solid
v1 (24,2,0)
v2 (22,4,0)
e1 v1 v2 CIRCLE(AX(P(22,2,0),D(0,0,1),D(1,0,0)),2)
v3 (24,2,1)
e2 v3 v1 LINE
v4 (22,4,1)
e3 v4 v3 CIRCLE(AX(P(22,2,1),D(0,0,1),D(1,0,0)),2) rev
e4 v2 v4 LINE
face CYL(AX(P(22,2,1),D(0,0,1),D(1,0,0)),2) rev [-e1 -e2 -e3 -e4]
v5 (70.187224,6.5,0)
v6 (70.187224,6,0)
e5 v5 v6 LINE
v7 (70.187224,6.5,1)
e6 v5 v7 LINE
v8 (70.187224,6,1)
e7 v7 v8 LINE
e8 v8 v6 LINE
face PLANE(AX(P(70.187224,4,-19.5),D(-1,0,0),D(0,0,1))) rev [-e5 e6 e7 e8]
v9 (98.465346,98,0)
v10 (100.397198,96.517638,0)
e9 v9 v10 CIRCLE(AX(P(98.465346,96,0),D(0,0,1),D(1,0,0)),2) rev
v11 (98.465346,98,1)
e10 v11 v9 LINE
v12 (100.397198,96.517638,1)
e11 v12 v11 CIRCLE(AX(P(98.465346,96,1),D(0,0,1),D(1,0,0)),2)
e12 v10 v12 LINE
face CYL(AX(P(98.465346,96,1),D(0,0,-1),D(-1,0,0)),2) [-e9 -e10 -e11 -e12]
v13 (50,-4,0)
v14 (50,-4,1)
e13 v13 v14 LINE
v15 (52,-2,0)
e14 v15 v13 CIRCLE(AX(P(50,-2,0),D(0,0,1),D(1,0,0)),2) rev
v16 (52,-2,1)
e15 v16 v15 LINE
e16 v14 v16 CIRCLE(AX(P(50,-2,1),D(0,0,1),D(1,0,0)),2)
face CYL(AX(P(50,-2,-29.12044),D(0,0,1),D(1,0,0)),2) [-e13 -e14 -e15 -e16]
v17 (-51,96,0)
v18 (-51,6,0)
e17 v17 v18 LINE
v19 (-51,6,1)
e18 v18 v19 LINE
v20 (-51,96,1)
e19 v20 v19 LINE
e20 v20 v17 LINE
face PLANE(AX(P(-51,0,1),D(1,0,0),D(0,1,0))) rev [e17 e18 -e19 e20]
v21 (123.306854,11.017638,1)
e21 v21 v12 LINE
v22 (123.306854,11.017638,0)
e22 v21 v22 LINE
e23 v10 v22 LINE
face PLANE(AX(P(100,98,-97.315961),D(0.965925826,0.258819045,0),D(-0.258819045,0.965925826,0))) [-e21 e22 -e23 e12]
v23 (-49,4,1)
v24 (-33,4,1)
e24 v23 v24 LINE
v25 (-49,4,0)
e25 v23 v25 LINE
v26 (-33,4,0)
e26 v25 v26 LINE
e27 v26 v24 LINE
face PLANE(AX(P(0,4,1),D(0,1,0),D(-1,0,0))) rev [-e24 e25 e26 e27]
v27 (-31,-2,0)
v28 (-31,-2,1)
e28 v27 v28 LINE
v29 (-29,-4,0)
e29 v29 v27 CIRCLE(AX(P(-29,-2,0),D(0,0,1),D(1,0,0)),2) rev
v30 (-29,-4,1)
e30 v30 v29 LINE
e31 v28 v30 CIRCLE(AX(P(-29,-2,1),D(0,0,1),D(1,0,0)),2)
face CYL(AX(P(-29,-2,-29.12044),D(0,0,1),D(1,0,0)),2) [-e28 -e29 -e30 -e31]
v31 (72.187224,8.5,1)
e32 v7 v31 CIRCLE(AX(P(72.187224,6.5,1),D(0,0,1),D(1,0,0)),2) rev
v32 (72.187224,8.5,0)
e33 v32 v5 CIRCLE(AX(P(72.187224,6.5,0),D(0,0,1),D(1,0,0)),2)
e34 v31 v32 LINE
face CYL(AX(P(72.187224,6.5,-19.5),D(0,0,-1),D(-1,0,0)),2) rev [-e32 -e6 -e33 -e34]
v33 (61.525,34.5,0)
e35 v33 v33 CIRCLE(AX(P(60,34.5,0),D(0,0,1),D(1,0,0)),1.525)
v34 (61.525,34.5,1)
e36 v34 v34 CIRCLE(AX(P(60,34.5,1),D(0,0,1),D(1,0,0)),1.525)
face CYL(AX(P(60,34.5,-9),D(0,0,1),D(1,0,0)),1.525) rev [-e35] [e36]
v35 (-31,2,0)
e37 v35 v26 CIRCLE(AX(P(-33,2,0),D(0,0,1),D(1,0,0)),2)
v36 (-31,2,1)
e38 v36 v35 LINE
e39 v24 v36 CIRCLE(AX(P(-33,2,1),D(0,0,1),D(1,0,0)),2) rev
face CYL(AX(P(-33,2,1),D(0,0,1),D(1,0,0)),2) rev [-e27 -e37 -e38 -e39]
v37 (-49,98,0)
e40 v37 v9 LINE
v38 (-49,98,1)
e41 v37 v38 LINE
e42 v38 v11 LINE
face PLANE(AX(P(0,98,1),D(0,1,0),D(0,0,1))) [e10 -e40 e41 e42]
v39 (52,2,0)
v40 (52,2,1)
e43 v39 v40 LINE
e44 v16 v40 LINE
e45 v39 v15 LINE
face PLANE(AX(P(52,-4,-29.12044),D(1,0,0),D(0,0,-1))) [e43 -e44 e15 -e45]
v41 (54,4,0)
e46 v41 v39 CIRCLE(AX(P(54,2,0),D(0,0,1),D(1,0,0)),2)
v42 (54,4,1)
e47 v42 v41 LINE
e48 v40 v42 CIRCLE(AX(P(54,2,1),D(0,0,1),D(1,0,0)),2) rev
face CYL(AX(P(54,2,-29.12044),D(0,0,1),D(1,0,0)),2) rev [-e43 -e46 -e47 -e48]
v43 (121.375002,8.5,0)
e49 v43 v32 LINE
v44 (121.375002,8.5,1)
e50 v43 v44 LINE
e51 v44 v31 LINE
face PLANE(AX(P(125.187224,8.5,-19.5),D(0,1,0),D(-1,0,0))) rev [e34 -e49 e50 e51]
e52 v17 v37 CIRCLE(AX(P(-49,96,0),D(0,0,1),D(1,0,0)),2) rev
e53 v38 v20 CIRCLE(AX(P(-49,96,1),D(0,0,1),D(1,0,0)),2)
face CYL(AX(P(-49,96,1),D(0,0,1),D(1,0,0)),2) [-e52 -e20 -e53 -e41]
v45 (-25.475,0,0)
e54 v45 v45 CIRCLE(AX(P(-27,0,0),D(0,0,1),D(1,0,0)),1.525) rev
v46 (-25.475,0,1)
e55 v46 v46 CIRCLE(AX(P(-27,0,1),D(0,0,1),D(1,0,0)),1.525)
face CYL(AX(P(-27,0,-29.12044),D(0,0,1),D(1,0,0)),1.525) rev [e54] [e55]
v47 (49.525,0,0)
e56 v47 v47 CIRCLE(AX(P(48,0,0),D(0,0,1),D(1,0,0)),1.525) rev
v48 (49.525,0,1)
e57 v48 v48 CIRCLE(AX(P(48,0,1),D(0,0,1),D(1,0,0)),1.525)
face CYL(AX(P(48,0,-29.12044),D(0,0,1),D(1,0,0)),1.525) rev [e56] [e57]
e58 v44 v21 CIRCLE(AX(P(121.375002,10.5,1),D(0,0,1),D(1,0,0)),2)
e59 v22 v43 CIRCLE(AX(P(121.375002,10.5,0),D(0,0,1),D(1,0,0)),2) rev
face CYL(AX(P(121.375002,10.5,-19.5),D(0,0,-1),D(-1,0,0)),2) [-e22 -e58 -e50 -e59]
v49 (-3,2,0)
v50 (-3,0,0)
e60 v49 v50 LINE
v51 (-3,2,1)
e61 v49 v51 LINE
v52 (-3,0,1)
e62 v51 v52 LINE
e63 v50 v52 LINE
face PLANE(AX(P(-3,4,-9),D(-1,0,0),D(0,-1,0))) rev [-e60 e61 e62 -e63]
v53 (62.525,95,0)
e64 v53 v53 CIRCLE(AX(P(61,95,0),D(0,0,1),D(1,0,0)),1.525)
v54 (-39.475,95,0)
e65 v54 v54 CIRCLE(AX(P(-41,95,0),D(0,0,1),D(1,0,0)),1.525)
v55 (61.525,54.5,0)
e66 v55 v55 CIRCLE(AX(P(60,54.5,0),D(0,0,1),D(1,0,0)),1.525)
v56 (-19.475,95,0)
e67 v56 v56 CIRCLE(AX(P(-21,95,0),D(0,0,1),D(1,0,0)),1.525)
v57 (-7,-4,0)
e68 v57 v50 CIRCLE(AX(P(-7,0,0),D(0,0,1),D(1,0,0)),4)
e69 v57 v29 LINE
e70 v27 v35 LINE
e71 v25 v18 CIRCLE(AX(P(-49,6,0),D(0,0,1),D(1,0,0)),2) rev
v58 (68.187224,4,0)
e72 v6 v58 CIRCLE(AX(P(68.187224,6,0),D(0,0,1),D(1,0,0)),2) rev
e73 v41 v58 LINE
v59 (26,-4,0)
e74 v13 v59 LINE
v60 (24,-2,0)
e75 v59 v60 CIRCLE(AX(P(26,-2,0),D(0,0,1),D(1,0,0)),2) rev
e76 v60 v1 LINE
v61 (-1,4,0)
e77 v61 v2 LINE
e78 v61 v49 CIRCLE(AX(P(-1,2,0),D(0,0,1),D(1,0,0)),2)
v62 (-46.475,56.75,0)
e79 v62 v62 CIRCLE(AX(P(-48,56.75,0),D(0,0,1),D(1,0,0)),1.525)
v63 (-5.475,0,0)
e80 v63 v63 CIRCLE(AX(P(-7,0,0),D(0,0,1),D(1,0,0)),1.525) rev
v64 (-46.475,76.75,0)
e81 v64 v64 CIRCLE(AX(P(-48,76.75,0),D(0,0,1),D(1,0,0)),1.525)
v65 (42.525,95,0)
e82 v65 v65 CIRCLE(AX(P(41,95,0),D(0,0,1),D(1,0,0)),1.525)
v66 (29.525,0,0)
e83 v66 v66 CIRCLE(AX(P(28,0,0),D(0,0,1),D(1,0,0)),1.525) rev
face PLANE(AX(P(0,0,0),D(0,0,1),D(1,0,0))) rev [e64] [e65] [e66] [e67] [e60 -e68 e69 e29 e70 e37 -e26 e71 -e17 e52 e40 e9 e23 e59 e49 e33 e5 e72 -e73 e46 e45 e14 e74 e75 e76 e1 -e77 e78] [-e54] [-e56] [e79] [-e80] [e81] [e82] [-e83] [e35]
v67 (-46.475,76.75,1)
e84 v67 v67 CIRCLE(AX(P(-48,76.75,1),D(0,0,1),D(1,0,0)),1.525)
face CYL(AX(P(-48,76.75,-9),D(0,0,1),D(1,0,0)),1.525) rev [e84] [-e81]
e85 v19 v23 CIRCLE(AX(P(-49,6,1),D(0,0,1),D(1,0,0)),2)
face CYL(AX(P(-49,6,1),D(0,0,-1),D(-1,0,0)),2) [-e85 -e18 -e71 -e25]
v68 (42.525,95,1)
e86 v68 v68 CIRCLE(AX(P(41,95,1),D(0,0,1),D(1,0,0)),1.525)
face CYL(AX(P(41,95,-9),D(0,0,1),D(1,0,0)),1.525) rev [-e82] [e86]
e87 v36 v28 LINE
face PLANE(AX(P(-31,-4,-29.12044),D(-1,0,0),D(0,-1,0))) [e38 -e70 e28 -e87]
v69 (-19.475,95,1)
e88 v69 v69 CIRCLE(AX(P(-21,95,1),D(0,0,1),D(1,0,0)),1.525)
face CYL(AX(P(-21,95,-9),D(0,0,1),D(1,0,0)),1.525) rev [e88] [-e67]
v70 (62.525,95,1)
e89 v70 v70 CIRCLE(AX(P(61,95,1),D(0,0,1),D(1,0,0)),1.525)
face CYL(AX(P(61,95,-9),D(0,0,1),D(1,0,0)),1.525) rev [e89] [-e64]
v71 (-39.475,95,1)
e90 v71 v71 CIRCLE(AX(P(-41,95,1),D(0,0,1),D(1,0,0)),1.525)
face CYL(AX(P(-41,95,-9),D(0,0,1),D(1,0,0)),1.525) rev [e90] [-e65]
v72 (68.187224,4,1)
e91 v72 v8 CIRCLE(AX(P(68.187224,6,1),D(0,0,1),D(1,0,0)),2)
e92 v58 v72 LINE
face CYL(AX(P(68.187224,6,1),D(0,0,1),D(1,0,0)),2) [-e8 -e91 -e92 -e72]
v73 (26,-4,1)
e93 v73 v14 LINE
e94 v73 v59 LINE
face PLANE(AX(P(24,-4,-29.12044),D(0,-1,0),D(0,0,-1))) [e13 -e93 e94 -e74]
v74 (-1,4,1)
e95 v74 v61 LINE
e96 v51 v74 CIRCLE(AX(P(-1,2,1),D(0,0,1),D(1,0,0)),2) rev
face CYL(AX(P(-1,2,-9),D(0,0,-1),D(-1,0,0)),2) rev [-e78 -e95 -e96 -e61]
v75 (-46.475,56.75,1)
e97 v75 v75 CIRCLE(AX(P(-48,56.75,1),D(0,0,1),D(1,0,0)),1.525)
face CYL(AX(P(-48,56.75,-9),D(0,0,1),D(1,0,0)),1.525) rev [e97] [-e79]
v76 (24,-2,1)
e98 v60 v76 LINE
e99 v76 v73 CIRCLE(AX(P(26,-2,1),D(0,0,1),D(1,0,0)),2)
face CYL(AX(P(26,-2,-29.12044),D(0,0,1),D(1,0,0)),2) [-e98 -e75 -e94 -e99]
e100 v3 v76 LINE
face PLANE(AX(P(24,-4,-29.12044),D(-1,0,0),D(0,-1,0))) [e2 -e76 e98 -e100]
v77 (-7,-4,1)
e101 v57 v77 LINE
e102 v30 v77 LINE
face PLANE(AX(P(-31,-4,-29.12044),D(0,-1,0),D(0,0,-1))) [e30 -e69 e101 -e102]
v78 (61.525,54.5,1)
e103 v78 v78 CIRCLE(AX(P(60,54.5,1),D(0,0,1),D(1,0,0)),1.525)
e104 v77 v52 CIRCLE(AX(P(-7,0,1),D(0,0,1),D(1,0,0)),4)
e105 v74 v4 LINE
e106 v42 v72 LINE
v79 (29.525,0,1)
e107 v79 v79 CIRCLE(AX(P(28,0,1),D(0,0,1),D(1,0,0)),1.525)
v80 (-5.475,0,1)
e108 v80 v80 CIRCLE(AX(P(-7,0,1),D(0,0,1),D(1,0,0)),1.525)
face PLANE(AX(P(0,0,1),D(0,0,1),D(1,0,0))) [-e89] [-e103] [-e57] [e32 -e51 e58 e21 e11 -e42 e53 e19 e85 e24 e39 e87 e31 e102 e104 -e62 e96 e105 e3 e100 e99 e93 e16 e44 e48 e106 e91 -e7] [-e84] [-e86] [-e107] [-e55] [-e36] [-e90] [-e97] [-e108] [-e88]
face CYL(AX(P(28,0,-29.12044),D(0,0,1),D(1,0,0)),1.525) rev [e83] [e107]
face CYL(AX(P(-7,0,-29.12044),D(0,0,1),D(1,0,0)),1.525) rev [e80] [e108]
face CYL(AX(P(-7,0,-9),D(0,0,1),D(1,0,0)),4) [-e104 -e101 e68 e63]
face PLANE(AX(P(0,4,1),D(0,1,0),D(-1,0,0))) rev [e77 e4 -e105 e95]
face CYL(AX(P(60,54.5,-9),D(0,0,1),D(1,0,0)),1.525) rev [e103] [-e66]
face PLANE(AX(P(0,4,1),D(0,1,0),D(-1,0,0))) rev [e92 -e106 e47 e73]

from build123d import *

# Parameters (mm, degrees)
SKETCH_1_W                 = 28
SKETCH_1_H                 = 8
SKETCH_1_R                 = 1.525
EXTRUDE_1_DEPTH            = 1
SKETCH_3_R                 = 1.525
CUT_EXTRUDE_1_DEPTH        = 10
SKETCH_5_R                 = 1.525
CUT_EXTRUDE_3_DEPTH        = 10
SKETCH_6_R                 = 1.525
CUT_EXTRUDE_4_DEPTH        = 10
EXTRUDE_2_DEPTH            = 1
SKETCH_9_W                 = 55
SKETCH_9_H                 = 4.5
CUT_EXTRUDE_5_DEPTH        = 20.5
FILLET_1_R                 = 2
SKETCH_10_R                = 1.525
CUT_EXTRUDE_6_DEPTH        = 10
SKETCH_11_W                = 28
SKETCH_11_H                = 8
SKETCH_11_R                = 1.525
EXTRUDE_3_DEPTH            = 1
FILLET_2_R                 = 2
SKETCH_12_W                = 29
SKETCH_12_H                = 8
CUT_EXTRUDE_7_DEPTH        = 10
PATTERN_LINEAR_1_OUTLINE_R = 1.525
PATTERN_LINEAR_1_DEPTH     = 1
CUT_EXTRUDE_8_DEPTH        = 10
FILLET_3_R                 = 2
FILLET_4_R                 = 2


with BuildPart() as part:
    # 草图1 → 凸台-拉伸1 (new body)
    # profile 1 of 2: a face of its own
    with BuildSketch(Plane.XY):
        Polygon((-4, 4), (24, 4), (100, 4), (100, 98), (-51, 98), (-51, 4), align=None)
    # profile 2 of 2: a face of its own
    with BuildSketch(Plane.XY):
        with Locations((10, 0)):
            Rectangle(SKETCH_1_W, SKETCH_1_H)
        with Locations((20, 0)):
            Circle(SKETCH_1_R, mode=Mode.SUBTRACT)
        Circle(SKETCH_1_R, mode=Mode.SUBTRACT)
    extrude(amount=EXTRUDE_1_DEPTH)

    # 草图3 → 切除-拉伸1 (cut)
    with BuildSketch(Plane.XY.offset(1)):
        with Locations((-48, 76.75)):
            Circle(SKETCH_3_R)
        with Locations((-48, 56.75)):
            Circle(SKETCH_3_R)
    extrude(amount=-CUT_EXTRUDE_1_DEPTH, mode=Mode.SUBTRACT)

    # 草图5 → 切除-拉伸3 (cut)
    with BuildSketch(Plane.XY.offset(1)):
        with Locations((-41, 95)):
            Circle(SKETCH_5_R)
        with Locations((-21, 95)):
            Circle(SKETCH_5_R)
    extrude(amount=-CUT_EXTRUDE_3_DEPTH, mode=Mode.SUBTRACT)

    # 草图6 → 切除-拉伸4 (cut)
    with BuildSketch(Plane.XY.offset(1)):
        with Locations((41, 95)):
            Circle(SKETCH_6_R)
        with Locations((61, 95)):
            Circle(SKETCH_6_R)
    extrude(amount=-CUT_EXTRUDE_4_DEPTH, mode=Mode.SUBTRACT)

    # 草图7 → 凸台-拉伸2 (add)
    with BuildSketch(Plane.XY.offset(1)):
        Polygon((100, 98), (125.187224089, 4), (100, 4), align=None)
    extrude(amount=-EXTRUDE_2_DEPTH)

    # 草图9 → 切除-拉伸5 (cut)
    with BuildSketch(Plane.XY.offset(1)):
        with Locations((97.687224089, 6.25)):
            Rectangle(SKETCH_9_W, SKETCH_9_H)
    extrude(amount=-CUT_EXTRUDE_5_DEPTH, mode=Mode.SUBTRACT)

    # 圆角1
    fillet_1_edges = [part.edges().sort_by_distance(p)[0] for p in [
        (24, 4, 0.5),
        (24, -4, 0.5),
        (-4, -4, 0.5),
        (-4, 4, 0.5),
        (-51, 4, 0.5),
        (-51, 98, 0.5),
        (100, 98, 0.5),
        (123.981452723, 8.5, 0.5),
        (70.187224089, 4, 0.5),
        (70.187224089, 8.5, 0.5),
    ]]
    fillet(fillet_1_edges, radius=FILLET_1_R)

    # 草图10 → 切除-拉伸6 (cut)
    with BuildSketch(Plane.XY.offset(1)):
        with Locations((60, 34.5)):
            Circle(SKETCH_10_R)
        with Locations((60, 54.5)):
            Circle(SKETCH_10_R)
    extrude(amount=-CUT_EXTRUDE_6_DEPTH, mode=Mode.SUBTRACT)

    # 草图11 → 凸台-拉伸3 (add)
    with BuildSketch(Plane.XY.offset(1)):
        with Locations((-17, 0)):
            Rectangle(SKETCH_11_W, SKETCH_11_H)
        with Locations((-27, 0)):
            Circle(SKETCH_11_R, mode=Mode.SUBTRACT)
        with Locations((-7, 0)):
            Circle(SKETCH_11_R, mode=Mode.SUBTRACT)
    extrude(amount=-EXTRUDE_3_DEPTH)

    # 圆角2
    # the kernel refuses this fillet: 2 mm, written as the material it adds along each edge
    with BuildSketch(Plane(origin=(-31, 4, 1), x_dir=(-1, 0, 0), z_dir=(0, 0, -1))) as fillet_2_piece_1:
        with BuildLine():
            CenterArc((FILLET_2_R, -FILLET_2_R), FILLET_2_R, 90, 90)
            Line((0, -FILLET_2_R), (0, 0))
            Line((0, 0), (FILLET_2_R, 0))
        make_face()
    extrude(amount=1)
    # the kernel refuses this fillet: 2 mm, written as the material it takes off along each edge
    with BuildSketch(Plane(origin=(-3, -4, 3.5), x_dir=(-1, 0, 0), z_dir=(0, 0, -1))) as fillet_2_2_piece_1:
        with BuildLine():
            CenterArc((1, 2), FILLET_2_R, 240, 30)
            Line((0, 0.267949192), (0, 0))
            Line((0, 0), (1, 0))
        make_face()
    extrude(amount=6, mode=Mode.SUBTRACT)
    with BuildSketch(Plane(origin=(-31, -4, 6), x_dir=(0, 1, 0), z_dir=(0, 0, -1))) as fillet_2_2_piece_2:
        with BuildLine():
            CenterArc((FILLET_2_R, FILLET_2_R), FILLET_2_R, 180, 90)
            Line((0, FILLET_2_R), (0, 0))
            Line((0, 0), (FILLET_2_R, 0))
        make_face()
    extrude(amount=11, mode=Mode.SUBTRACT)

    # 草图12 → 切除-拉伸7 (cut)
    with BuildSketch(Plane.XY.offset(1)):
        with Locations((11.5, 0)):
            Rectangle(SKETCH_12_W, SKETCH_12_H)
    extrude(amount=-CUT_EXTRUDE_7_DEPTH, mode=Mode.SUBTRACT)

    # 阵列(线性)1: read off the stored shape, not the designer's step
    # 阵列(线性)1 outline → 阵列(线性)1 (add)
    with BuildSketch(Plane.XY):
        with BuildLine():
            ThreePointArc((24, -2), (24.585786438, -3.414213562), (26, -4))
            Line((26, -4), (50, -4))
            ThreePointArc((50, -4), (51.414213562, -3.414213562), (52, -2))
            Line((52, -2), (52, 4))
            Line((52, 4), (22, 4))
            ThreePointArc((22, 4), (23.414213562, 3.414213562), (24, 2))
            Line((24, 2), (24, -2))
        make_face()
        with Locations((28, 0)):
            Circle(PATTERN_LINEAR_1_OUTLINE_R, mode=Mode.SUBTRACT)
        with Locations((48, 0)):
            Circle(PATTERN_LINEAR_1_OUTLINE_R, mode=Mode.SUBTRACT)
    extrude(amount=PATTERN_LINEAR_1_DEPTH)

    # 草图13 → 切除-拉伸8 (cut)
    with BuildSketch(Plane.XY.offset(1)):
        with BuildLine():
            ThreePointArc((-3, 0), (-4.171572875, -2.828427125), (-7, -4))
            Line((-7, -4), (-4, -4))
            ThreePointArc((-4, -4), (-3.48236191, -3.931851653), (-3, -3.732050808))
            Line((-3, -3.732050808), (-3, 0))
        make_face()
    extrude(amount=-CUT_EXTRUDE_8_DEPTH, mode=Mode.SUBTRACT)

    # 圆角3
    fillet_3_edges = [part.edges().sort_by_distance(p)[0] for p in [
        (-3, 4, 0.5),
    ]]
    fillet(fillet_3_edges, radius=FILLET_3_R)

    # 圆角4
    fillet_4_edges = [part.edges().sort_by_distance(p)[0] for p in [
        (52, 4, 0.5),
    ]]
    fillet(fillet_4_edges, radius=FILLET_4_R)


solid = part.part
